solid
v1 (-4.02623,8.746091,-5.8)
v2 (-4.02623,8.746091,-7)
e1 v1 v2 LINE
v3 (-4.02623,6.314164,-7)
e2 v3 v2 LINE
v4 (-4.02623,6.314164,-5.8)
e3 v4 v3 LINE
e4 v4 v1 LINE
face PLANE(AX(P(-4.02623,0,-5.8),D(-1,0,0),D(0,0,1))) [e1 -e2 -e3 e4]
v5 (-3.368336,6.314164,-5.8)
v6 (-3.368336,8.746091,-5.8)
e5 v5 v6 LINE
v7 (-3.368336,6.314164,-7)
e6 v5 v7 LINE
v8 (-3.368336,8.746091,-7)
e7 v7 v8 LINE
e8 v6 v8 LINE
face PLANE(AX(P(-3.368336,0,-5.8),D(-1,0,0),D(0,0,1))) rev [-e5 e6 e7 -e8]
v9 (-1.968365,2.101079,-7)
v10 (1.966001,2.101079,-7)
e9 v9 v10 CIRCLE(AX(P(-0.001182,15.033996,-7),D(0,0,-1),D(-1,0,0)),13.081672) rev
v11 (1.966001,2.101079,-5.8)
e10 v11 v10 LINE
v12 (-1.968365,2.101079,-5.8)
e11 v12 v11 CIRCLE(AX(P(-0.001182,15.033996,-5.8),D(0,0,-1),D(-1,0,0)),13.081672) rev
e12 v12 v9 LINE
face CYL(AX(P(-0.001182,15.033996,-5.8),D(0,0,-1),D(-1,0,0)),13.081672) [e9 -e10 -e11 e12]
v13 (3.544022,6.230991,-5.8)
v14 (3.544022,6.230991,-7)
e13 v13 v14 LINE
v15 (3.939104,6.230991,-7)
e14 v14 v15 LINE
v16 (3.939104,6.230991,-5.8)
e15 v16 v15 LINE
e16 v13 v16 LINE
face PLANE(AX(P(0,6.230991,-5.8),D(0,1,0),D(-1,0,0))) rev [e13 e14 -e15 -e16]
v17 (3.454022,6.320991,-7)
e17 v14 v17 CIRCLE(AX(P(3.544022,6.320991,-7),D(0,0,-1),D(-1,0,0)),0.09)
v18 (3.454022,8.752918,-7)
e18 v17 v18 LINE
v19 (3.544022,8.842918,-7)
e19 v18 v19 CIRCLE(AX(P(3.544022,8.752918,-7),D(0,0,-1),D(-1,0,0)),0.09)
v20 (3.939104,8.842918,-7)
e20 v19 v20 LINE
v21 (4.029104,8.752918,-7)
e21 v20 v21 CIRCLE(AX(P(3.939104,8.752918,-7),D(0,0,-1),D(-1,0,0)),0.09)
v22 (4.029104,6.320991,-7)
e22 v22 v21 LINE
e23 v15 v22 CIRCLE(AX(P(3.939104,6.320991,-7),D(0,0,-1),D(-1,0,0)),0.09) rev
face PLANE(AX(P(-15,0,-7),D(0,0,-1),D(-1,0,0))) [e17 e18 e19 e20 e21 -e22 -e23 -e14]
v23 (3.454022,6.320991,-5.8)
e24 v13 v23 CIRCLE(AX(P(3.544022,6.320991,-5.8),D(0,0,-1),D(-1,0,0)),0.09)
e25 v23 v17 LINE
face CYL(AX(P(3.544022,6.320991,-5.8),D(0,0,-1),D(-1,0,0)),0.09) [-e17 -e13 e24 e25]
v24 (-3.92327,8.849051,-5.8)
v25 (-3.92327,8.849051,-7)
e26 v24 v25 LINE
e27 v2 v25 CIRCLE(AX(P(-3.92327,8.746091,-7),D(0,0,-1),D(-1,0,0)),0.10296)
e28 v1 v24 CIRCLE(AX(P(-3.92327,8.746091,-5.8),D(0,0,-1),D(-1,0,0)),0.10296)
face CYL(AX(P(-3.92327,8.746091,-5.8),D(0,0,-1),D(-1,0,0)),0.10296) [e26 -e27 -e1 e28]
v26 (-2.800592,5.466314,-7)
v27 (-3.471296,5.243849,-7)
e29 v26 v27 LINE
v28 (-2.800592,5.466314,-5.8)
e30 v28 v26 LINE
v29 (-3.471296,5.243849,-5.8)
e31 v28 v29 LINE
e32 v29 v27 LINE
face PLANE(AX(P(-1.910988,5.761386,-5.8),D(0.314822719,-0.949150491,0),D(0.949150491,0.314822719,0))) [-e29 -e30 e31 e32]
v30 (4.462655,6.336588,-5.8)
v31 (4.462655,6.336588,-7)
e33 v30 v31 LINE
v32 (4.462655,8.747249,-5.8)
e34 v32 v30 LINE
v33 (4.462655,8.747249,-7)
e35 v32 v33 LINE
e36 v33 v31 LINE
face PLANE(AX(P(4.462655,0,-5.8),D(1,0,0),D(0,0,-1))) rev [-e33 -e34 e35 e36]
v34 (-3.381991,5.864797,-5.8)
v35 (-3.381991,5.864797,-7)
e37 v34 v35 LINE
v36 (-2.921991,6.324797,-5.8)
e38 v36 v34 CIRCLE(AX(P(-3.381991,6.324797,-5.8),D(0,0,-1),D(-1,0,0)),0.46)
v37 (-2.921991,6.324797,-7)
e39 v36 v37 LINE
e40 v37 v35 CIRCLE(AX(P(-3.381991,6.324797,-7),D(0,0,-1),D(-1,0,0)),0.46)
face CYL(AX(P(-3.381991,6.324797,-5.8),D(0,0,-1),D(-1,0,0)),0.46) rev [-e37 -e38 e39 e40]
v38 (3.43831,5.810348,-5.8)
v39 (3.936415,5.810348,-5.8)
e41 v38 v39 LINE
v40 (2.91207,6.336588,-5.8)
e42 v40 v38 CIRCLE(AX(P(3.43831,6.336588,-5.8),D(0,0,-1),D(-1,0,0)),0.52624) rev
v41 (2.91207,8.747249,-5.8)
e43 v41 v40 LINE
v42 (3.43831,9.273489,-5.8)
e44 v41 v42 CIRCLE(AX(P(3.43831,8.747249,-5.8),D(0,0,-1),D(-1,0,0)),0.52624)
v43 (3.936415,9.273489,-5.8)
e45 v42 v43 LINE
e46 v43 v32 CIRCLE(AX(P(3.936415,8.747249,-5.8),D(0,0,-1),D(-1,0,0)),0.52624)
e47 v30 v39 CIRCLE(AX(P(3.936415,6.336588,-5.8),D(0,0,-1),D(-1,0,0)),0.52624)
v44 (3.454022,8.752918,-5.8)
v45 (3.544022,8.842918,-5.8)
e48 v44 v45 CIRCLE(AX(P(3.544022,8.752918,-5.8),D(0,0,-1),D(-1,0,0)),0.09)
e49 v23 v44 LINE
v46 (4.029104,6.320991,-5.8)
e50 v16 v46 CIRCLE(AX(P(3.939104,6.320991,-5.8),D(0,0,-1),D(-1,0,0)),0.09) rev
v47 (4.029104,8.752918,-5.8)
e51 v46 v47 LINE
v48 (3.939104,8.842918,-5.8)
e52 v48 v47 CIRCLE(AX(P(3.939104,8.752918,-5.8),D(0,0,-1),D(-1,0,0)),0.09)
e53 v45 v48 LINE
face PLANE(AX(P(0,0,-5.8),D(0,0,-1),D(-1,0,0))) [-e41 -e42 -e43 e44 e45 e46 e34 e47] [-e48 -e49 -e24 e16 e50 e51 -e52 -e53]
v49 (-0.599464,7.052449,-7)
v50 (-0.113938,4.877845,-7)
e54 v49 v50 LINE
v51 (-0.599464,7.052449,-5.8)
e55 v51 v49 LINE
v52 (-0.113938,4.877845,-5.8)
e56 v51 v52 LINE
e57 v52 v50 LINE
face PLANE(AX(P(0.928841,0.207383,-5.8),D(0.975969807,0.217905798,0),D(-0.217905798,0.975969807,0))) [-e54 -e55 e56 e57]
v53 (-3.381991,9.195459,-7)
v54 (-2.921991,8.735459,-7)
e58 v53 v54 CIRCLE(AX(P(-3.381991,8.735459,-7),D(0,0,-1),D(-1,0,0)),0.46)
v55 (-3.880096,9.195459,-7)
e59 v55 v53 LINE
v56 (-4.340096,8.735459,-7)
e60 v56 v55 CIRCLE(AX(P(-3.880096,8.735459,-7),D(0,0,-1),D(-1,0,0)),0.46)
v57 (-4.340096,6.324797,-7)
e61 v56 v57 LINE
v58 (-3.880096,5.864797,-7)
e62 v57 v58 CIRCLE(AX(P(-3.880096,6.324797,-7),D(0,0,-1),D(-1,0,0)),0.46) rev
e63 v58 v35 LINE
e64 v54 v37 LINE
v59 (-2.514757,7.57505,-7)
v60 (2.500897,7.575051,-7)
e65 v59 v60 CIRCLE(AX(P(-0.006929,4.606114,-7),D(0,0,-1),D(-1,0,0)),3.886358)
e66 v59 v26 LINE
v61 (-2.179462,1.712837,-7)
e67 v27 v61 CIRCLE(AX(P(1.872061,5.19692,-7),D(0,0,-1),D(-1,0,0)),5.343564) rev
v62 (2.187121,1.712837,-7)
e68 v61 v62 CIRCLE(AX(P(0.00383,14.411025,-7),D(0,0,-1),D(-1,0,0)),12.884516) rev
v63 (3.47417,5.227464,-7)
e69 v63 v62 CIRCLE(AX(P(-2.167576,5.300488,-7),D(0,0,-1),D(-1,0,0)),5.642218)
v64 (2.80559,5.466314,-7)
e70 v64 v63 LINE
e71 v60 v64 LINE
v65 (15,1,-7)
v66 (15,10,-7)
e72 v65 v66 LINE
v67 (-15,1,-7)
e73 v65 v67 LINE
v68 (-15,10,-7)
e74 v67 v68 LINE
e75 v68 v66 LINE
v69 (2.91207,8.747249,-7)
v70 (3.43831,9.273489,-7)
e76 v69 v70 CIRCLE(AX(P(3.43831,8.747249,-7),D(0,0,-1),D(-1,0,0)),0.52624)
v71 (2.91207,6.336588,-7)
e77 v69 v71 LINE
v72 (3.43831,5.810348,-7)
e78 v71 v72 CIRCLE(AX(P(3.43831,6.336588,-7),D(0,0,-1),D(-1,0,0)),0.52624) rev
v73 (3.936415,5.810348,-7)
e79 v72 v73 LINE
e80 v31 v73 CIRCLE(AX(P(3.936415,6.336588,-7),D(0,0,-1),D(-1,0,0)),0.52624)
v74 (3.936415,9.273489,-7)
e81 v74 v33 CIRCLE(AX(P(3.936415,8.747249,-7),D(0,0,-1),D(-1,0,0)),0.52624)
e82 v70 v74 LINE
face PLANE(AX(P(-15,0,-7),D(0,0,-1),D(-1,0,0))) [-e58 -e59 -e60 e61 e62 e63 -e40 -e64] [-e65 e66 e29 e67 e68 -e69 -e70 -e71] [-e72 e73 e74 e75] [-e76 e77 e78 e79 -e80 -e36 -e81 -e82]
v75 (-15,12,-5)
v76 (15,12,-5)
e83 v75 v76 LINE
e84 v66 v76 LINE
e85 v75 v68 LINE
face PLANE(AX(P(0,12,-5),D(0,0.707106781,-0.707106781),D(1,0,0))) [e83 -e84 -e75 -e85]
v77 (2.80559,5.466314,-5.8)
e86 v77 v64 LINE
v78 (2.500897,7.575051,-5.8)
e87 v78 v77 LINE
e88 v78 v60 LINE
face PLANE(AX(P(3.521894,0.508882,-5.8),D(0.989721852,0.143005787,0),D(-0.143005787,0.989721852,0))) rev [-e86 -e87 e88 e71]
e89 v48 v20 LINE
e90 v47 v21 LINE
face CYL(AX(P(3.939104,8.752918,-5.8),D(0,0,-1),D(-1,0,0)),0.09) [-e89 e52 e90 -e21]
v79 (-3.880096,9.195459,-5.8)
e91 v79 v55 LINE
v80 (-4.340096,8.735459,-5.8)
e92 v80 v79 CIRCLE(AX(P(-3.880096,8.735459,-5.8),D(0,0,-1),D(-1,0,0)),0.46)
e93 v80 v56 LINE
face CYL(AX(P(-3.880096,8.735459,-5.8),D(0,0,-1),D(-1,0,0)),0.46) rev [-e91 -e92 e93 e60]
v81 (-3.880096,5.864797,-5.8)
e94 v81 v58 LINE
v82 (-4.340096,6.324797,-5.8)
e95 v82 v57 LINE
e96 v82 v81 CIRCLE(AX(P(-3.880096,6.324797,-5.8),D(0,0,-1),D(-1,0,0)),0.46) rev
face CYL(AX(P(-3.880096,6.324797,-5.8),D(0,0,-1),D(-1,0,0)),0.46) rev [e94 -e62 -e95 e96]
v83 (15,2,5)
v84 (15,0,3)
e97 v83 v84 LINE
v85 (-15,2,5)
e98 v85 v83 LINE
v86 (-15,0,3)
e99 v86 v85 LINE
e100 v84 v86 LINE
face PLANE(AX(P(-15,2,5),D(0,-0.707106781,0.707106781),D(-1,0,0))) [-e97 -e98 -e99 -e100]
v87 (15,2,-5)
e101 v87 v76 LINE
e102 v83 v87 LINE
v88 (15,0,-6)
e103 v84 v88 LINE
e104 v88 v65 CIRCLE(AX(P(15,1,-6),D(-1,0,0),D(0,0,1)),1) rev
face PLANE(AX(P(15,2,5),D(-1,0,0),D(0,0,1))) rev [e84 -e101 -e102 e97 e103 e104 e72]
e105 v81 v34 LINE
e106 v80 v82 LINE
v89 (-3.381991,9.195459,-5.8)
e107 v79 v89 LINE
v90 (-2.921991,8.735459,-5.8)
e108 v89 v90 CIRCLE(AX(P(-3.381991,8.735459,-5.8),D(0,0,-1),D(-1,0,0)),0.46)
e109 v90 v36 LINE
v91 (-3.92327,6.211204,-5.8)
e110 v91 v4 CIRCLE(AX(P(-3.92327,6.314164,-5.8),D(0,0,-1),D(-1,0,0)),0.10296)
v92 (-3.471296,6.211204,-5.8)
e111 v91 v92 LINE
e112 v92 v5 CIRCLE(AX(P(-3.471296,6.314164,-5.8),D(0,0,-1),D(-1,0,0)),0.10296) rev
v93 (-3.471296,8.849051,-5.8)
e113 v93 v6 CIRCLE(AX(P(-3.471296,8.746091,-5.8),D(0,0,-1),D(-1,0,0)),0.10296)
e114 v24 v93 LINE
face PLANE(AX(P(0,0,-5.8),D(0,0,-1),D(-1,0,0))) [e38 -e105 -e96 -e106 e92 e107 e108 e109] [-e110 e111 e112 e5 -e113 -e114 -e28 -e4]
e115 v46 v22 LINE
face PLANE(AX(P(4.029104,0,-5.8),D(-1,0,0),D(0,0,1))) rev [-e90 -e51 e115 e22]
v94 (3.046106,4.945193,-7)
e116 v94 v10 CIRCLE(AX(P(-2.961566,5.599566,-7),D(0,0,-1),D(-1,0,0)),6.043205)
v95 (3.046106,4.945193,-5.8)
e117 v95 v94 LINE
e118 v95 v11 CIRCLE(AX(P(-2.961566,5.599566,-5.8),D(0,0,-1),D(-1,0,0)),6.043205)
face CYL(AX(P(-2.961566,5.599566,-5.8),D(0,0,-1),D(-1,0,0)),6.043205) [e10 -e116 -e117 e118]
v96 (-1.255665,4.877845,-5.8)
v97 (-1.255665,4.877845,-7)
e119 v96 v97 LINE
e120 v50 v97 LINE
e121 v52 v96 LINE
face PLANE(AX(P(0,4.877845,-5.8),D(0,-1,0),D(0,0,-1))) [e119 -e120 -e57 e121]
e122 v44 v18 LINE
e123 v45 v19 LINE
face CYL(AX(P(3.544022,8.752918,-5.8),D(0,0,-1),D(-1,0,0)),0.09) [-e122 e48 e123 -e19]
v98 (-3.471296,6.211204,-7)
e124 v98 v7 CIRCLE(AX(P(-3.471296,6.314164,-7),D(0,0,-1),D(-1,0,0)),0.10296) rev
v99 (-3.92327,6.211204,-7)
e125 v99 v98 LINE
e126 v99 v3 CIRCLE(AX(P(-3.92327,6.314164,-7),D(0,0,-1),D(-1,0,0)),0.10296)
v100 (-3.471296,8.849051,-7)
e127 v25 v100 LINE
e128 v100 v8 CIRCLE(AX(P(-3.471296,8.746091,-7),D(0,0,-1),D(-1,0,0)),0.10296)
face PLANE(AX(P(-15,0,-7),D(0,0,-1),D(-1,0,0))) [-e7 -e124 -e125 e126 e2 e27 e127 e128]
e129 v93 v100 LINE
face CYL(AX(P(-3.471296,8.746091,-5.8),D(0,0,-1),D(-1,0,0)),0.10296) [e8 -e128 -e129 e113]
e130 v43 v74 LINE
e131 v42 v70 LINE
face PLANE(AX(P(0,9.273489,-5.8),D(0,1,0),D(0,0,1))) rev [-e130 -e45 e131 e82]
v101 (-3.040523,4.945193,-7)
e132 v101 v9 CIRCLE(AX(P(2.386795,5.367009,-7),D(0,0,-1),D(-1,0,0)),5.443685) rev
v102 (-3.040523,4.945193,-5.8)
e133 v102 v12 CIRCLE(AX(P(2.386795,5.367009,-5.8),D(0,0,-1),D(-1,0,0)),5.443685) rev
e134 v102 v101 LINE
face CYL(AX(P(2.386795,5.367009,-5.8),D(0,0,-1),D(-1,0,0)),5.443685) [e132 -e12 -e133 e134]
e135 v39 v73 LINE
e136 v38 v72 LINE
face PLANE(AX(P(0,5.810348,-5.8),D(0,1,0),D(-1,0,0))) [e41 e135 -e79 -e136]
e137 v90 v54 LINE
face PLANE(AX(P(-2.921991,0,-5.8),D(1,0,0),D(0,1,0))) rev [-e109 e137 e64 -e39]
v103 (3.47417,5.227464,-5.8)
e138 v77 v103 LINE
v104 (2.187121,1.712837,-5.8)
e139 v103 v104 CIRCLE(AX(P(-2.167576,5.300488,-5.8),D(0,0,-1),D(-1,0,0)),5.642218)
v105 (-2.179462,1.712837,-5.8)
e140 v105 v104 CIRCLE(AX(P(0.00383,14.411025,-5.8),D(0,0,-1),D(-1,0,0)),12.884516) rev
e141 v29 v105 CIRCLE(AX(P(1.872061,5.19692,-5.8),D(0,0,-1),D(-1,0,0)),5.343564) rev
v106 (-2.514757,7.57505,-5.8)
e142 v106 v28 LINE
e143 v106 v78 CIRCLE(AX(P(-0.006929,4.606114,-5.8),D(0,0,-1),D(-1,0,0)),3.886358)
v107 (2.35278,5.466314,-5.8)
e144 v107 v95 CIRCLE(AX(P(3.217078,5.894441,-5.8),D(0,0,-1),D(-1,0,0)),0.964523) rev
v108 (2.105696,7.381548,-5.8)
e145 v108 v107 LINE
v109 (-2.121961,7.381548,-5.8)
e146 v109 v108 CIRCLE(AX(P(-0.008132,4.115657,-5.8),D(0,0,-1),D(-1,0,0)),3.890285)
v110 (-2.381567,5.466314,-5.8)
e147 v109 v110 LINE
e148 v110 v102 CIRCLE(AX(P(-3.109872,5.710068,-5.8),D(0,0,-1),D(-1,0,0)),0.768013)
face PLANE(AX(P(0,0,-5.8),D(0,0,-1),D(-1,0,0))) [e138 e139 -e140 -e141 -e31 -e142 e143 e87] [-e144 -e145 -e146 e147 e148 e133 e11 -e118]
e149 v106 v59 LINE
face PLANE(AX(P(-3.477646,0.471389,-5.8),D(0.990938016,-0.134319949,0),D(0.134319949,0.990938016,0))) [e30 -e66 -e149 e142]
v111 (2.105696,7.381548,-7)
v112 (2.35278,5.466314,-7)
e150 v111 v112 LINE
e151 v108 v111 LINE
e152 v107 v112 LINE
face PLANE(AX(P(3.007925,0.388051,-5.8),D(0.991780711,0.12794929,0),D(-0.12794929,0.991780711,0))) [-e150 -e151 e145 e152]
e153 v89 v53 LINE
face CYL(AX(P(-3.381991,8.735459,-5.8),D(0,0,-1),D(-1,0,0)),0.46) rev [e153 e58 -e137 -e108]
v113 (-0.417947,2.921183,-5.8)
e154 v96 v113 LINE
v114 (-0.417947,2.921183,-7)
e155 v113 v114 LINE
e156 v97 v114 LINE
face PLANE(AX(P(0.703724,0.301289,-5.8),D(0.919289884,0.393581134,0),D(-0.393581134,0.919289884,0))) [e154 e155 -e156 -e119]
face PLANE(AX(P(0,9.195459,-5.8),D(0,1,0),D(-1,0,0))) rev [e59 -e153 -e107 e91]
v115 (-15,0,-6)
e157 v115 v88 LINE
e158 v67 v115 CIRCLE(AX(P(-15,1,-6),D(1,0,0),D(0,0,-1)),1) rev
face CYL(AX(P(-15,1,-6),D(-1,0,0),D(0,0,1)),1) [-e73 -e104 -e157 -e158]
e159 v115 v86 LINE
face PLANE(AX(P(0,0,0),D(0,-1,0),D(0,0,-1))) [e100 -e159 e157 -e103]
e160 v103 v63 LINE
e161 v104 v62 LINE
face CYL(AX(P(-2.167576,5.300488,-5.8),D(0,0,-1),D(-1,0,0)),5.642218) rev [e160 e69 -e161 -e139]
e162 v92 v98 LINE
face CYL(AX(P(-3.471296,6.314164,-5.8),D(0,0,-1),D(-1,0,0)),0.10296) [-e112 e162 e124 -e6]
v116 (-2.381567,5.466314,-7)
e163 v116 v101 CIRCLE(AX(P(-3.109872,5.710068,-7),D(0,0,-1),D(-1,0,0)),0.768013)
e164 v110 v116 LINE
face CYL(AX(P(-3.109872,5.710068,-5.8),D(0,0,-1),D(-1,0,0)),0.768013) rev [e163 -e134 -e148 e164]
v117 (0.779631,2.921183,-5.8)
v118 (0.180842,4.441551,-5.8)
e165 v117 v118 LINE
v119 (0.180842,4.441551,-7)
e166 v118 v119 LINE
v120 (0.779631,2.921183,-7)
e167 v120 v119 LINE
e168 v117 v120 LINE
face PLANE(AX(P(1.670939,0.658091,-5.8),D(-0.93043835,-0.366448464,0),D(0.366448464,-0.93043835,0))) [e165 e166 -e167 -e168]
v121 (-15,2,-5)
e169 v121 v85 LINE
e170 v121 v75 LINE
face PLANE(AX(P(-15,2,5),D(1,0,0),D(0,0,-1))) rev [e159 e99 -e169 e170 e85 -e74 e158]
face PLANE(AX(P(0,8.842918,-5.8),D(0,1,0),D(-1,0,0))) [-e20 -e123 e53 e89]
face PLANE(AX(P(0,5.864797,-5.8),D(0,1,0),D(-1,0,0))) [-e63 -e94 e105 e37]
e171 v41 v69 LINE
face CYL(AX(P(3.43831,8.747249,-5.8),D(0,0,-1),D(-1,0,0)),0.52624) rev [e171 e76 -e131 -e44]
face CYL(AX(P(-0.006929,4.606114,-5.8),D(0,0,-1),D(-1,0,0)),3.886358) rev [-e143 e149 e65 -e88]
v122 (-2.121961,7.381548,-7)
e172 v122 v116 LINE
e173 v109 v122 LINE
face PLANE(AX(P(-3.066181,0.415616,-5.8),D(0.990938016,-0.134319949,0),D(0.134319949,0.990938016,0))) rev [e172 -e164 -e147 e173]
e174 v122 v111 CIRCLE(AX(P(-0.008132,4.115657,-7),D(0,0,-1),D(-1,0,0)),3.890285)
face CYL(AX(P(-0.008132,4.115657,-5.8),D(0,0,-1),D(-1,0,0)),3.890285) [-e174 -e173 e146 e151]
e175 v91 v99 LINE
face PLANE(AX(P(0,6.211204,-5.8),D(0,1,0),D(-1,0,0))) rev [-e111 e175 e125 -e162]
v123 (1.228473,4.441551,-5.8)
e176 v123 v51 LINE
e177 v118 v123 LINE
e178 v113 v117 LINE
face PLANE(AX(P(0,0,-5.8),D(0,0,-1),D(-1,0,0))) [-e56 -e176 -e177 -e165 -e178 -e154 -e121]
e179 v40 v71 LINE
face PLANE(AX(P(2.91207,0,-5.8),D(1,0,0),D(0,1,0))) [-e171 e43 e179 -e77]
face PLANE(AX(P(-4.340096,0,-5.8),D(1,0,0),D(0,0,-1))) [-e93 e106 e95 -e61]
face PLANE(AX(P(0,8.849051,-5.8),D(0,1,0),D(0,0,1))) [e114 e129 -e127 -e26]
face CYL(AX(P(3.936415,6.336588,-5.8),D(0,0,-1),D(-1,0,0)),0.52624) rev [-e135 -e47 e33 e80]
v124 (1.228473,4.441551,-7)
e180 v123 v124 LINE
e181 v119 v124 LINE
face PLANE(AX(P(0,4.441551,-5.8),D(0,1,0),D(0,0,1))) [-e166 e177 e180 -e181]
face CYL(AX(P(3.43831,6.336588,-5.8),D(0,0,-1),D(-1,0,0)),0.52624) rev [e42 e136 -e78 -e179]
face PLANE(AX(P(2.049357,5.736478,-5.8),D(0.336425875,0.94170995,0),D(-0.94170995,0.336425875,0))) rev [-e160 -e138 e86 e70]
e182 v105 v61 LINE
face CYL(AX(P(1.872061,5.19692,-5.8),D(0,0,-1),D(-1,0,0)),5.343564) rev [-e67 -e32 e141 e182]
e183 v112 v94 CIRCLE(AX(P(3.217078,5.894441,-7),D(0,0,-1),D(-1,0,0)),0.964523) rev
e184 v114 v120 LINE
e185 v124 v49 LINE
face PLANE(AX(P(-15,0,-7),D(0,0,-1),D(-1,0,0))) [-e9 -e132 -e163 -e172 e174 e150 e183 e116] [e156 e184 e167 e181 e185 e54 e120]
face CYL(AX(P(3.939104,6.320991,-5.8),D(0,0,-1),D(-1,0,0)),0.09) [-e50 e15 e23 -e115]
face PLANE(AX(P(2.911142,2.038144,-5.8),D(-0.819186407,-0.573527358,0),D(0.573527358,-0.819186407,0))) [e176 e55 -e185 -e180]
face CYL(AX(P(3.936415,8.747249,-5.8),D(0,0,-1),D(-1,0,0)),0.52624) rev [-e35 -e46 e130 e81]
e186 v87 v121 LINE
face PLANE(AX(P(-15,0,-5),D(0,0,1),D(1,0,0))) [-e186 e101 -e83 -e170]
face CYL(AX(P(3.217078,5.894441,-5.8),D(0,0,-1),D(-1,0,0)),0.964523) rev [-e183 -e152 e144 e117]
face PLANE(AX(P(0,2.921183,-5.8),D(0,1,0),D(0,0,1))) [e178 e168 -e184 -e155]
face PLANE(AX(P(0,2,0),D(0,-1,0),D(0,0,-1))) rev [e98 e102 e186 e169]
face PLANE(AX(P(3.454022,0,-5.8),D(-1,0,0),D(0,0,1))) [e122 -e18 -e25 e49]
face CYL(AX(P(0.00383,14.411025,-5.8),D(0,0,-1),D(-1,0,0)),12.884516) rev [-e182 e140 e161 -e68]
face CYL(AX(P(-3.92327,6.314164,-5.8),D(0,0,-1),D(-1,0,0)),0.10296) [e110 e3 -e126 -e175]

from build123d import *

# Parameters (mm, degrees)
CROQUIS1_W                   = 30
CROQUIS1_H                   = 10
SALIENTE_EXTRUIR1_DEPTH      = 2
SALIENTE_EXTRUIR2_DEPTH      = 10
SALIENTE_EXTRUIR2_DEPTH_BACK = 2
CROQUIS2_W                   = 30
CROQUIS2_H                   = 2
CHAFL_N1_SIZE                = 2
REDONDEO2_R                  = 1
CHAFL_N2_SIZE                = 2
CORTAR_EXTRUIR1_DEPTH        = 1.2


with BuildPart() as part:
    # Croquis1 → Saliente-Extruir1 (new body)
    with BuildSketch(Plane(origin=(0, 0, 0), x_dir=(1, 0, 0), z_dir=(0, 1, 0))):
        Rectangle(CROQUIS1_W, CROQUIS1_H)
    extrude(amount=SALIENTE_EXTRUIR1_DEPTH)

    # Croquis2 → Saliente-Extruir2 (add, two sides: drawn at the far end of the back side and taken through both)
    with BuildSketch(Plane(origin=(0, 2, 0), x_dir=(1, 0, 0), z_dir=(0, 1, 0)).offset(-SALIENTE_EXTRUIR2_DEPTH_BACK)):
        with Locations((0, 6)):
            Rectangle(CROQUIS2_W, CROQUIS2_H)
    extrude(amount=SALIENTE_EXTRUIR2_DEPTH + SALIENTE_EXTRUIR2_DEPTH_BACK)

    # Chaflán1
    chafl_n1_edges = [part.edges().sort_by_distance(p)[0] for p in [
        (0, 12, -7),
    ]]
    chamfer(chafl_n1_edges, length=CHAFL_N1_SIZE - 0.0001)  # a hair under: the kernel refuses the full size

    # Redondeo2
    redondeo2_edges = [part.edges().sort_by_distance(p)[0] for p in [
        (0, 0, -7),
    ]]
    fillet(redondeo2_edges, radius=REDONDEO2_R)

    # Chaflán2
    chafl_n2_edges = [part.edges().sort_by_distance(p)[0] for p in [
        (0, 0, 5),
    ]]
    chamfer(chafl_n2_edges, length=CHAFL_N2_SIZE - 0.0001)  # a hair under: the kernel refuses the full size

    # Croquis3 → Cortar-Extruir1 (cut)
    # profile 1 of 4: a face of its own
    with BuildSketch(Plane(origin=(0, 0, -7), x_dir=(-1, 0, 0), z_dir=(0, 0, -1))):
        with BuildLine():
            ThreePointArc((2.179461585, 1.712836764), (-0.003829875, 1.526509248), (-2.187121335, 1.712836764))
            ThreePointArc((-2.187121335, 1.712836764), (-3.13057186, 3.360317888), (-3.474170032, 5.227463636))
            Line((-3.474170032, 5.227463636), (-2.805590027, 5.46631384))
            Line((-2.805590027, 5.46631384), (-2.500896715, 7.575051077))
            ThreePointArc((-2.500896715, 7.575051077), (0.006930249, 8.492471905), (2.514756719, 7.575049726))
            Line((2.514756719, 7.575049726), (2.800592253, 5.46631384))
            Line((2.800592253, 5.46631384), (3.47129645, 5.243848676))
            ThreePointArc((3.47129645, 5.243848676), (3.146201029, 3.360968701), (2.179461585, 1.712836764))
        make_face()
        with BuildLine():
            ThreePointArc((3.04052308, 4.945192572), (2.706972006, 3.446787944), (1.968364572, 2.101079281))
            ThreePointArc((1.968364572, 2.101079281), (0.001181819, 1.952323974), (-1.966000935, 2.101079281))
            ThreePointArc((-1.966000935, 2.101079281), (-2.687956628, 3.454054765), (-3.046105657, 4.945192572))
            ThreePointArc((-3.046105657, 4.945192572), (-2.637562578, 5.123424768), (-2.352779772, 5.46631384))
            Line((-2.352779772, 5.46631384), (-2.105696131, 7.381547512))
            ThreePointArc((-2.105696131, 7.381547512), (0.008132207, 8.005941127), (2.121960546, 7.381547512))
            Line((2.121960546, 7.381547512), (2.381567187, 5.46631384))
            ThreePointArc((2.381567187, 5.46631384), (2.633474347, 5.107665237), (3.04052308, 4.945192572))
        make_face(mode=Mode.SUBTRACT)
    # profile 2 of 4: a face of its own
    with BuildSketch(Plane(origin=(0, 0, -7), x_dir=(-1, 0, 0), z_dir=(0, 0, -1))):
        with BuildLine():
            Line((2.92199069, 8.735458595), (2.92199069, 6.324796966))
            ThreePointArc((2.92199069, 6.324796966), (3.056721571, 5.999527847), (3.38199069, 5.864796966))
            Line((3.38199069, 5.864796966), (3.880095869, 5.864796966))
            ThreePointArc((3.880095869, 5.864796966), (4.205364988, 5.999527847), (4.340095869, 6.324796966))
            Line((4.340095869, 6.324796966), (4.340095869, 8.735458595))
            ThreePointArc((4.340095869, 8.735458595), (4.205364988, 9.060727715), (3.880095869, 9.195458595))
            Line((3.880095869, 9.195458595), (3.38199069, 9.195458595))
            ThreePointArc((3.38199069, 9.195458595), (3.056721571, 9.060727715), (2.92199069, 8.735458595))
        make_face()
        with BuildLine():
            ThreePointArc((3.47129645, 8.849051475), (3.398492736, 8.818895189), (3.36833645, 8.746091475))
            Line((3.36833645, 8.746091475), (3.36833645, 6.314164086))
            ThreePointArc((3.36833645, 6.314164086), (3.398492736, 6.241360372), (3.47129645, 6.211204086))
            Line((3.47129645, 6.211204086), (3.923270109, 6.211204086))
            ThreePointArc((3.923270109, 6.211204086), (3.996073823, 6.241360372), (4.026230109, 6.314164086))
            Line((4.026230109, 6.314164086), (4.026230109, 8.746091475))
            ThreePointArc((4.026230109, 8.746091475), (3.996073823, 8.818895189), (3.923270109, 8.849051475))
            Line((3.923270109, 8.849051475), (3.47129645, 8.849051475))
        make_face(mode=Mode.SUBTRACT)
    # profile 3 of 4: a face of its own
    with BuildSketch(Plane(origin=(0, 0, -7), x_dir=(-1, 0, 0), z_dir=(0, 0, -1))):
        Polygon((1.255664584, 4.877844546), (0.417947415, 2.921183382), (-0.779631115, 2.921183382), (-0.18084185, 4.441551322), (-1.228472775, 4.441551322), (0.599464258, 7.052448867), (0.113938081, 4.877844546), align=None)
    # profile 4 of 4: a face of its own
    with BuildSketch(Plane(origin=(0, 0, -7), x_dir=(-1, 0, 0), z_dir=(0, 0, -1))):
        with BuildLine():
            Line((-4.462655299, 8.747249221), (-4.462655299, 6.336587592))
            ThreePointArc((-4.462655299, 6.336587592), (-4.308523171, 5.964479719), (-3.936415299, 5.810347592))
            Line((-3.936415299, 5.810347592), (-3.43831012, 5.810347592))
            ThreePointArc((-3.43831012, 5.810347592), (-3.066202247, 5.964479719), (-2.91207012, 6.336587592))
            Line((-2.91207012, 6.336587592), (-2.91207012, 8.747249221))
            ThreePointArc((-2.91207012, 8.747249221), (-3.066202247, 9.119357093), (-3.43831012, 9.273489221))
            Line((-3.43831012, 9.273489221), (-3.936415299, 9.273489221))
            ThreePointArc((-3.936415299, 9.273489221), (-4.308523171, 9.119357093), (-4.462655299, 8.747249221))
        make_face()
        with BuildLine():
            ThreePointArc((-3.939103691, 8.842918202), (-4.002743301, 8.816557812), (-4.029103691, 8.752918202))
            Line((-4.029103691, 8.752918202), (-4.029103691, 6.320990813))
            ThreePointArc((-4.029103691, 6.320990813), (-4.002743301, 6.257351203), (-3.939103691, 6.230990813))
            Line((-3.939103691, 6.230990813), (-3.544021822, 6.230990813))
            ThreePointArc((-3.544021822, 6.230990813), (-3.480382211, 6.257351203), (-3.454021822, 6.320990813))
            Line((-3.454021822, 6.320990813), (-3.454021822, 8.752918202))
            ThreePointArc((-3.454021822, 8.752918202), (-3.480382211, 8.816557812), (-3.544021822, 8.842918202))
            Line((-3.544021822, 8.842918202), (-3.939103691, 8.842918202))
        make_face(mode=Mode.SUBTRACT)
    extrude(amount=-CORTAR_EXTRUIR1_DEPTH, mode=Mode.SUBTRACT)


solid = part.part
